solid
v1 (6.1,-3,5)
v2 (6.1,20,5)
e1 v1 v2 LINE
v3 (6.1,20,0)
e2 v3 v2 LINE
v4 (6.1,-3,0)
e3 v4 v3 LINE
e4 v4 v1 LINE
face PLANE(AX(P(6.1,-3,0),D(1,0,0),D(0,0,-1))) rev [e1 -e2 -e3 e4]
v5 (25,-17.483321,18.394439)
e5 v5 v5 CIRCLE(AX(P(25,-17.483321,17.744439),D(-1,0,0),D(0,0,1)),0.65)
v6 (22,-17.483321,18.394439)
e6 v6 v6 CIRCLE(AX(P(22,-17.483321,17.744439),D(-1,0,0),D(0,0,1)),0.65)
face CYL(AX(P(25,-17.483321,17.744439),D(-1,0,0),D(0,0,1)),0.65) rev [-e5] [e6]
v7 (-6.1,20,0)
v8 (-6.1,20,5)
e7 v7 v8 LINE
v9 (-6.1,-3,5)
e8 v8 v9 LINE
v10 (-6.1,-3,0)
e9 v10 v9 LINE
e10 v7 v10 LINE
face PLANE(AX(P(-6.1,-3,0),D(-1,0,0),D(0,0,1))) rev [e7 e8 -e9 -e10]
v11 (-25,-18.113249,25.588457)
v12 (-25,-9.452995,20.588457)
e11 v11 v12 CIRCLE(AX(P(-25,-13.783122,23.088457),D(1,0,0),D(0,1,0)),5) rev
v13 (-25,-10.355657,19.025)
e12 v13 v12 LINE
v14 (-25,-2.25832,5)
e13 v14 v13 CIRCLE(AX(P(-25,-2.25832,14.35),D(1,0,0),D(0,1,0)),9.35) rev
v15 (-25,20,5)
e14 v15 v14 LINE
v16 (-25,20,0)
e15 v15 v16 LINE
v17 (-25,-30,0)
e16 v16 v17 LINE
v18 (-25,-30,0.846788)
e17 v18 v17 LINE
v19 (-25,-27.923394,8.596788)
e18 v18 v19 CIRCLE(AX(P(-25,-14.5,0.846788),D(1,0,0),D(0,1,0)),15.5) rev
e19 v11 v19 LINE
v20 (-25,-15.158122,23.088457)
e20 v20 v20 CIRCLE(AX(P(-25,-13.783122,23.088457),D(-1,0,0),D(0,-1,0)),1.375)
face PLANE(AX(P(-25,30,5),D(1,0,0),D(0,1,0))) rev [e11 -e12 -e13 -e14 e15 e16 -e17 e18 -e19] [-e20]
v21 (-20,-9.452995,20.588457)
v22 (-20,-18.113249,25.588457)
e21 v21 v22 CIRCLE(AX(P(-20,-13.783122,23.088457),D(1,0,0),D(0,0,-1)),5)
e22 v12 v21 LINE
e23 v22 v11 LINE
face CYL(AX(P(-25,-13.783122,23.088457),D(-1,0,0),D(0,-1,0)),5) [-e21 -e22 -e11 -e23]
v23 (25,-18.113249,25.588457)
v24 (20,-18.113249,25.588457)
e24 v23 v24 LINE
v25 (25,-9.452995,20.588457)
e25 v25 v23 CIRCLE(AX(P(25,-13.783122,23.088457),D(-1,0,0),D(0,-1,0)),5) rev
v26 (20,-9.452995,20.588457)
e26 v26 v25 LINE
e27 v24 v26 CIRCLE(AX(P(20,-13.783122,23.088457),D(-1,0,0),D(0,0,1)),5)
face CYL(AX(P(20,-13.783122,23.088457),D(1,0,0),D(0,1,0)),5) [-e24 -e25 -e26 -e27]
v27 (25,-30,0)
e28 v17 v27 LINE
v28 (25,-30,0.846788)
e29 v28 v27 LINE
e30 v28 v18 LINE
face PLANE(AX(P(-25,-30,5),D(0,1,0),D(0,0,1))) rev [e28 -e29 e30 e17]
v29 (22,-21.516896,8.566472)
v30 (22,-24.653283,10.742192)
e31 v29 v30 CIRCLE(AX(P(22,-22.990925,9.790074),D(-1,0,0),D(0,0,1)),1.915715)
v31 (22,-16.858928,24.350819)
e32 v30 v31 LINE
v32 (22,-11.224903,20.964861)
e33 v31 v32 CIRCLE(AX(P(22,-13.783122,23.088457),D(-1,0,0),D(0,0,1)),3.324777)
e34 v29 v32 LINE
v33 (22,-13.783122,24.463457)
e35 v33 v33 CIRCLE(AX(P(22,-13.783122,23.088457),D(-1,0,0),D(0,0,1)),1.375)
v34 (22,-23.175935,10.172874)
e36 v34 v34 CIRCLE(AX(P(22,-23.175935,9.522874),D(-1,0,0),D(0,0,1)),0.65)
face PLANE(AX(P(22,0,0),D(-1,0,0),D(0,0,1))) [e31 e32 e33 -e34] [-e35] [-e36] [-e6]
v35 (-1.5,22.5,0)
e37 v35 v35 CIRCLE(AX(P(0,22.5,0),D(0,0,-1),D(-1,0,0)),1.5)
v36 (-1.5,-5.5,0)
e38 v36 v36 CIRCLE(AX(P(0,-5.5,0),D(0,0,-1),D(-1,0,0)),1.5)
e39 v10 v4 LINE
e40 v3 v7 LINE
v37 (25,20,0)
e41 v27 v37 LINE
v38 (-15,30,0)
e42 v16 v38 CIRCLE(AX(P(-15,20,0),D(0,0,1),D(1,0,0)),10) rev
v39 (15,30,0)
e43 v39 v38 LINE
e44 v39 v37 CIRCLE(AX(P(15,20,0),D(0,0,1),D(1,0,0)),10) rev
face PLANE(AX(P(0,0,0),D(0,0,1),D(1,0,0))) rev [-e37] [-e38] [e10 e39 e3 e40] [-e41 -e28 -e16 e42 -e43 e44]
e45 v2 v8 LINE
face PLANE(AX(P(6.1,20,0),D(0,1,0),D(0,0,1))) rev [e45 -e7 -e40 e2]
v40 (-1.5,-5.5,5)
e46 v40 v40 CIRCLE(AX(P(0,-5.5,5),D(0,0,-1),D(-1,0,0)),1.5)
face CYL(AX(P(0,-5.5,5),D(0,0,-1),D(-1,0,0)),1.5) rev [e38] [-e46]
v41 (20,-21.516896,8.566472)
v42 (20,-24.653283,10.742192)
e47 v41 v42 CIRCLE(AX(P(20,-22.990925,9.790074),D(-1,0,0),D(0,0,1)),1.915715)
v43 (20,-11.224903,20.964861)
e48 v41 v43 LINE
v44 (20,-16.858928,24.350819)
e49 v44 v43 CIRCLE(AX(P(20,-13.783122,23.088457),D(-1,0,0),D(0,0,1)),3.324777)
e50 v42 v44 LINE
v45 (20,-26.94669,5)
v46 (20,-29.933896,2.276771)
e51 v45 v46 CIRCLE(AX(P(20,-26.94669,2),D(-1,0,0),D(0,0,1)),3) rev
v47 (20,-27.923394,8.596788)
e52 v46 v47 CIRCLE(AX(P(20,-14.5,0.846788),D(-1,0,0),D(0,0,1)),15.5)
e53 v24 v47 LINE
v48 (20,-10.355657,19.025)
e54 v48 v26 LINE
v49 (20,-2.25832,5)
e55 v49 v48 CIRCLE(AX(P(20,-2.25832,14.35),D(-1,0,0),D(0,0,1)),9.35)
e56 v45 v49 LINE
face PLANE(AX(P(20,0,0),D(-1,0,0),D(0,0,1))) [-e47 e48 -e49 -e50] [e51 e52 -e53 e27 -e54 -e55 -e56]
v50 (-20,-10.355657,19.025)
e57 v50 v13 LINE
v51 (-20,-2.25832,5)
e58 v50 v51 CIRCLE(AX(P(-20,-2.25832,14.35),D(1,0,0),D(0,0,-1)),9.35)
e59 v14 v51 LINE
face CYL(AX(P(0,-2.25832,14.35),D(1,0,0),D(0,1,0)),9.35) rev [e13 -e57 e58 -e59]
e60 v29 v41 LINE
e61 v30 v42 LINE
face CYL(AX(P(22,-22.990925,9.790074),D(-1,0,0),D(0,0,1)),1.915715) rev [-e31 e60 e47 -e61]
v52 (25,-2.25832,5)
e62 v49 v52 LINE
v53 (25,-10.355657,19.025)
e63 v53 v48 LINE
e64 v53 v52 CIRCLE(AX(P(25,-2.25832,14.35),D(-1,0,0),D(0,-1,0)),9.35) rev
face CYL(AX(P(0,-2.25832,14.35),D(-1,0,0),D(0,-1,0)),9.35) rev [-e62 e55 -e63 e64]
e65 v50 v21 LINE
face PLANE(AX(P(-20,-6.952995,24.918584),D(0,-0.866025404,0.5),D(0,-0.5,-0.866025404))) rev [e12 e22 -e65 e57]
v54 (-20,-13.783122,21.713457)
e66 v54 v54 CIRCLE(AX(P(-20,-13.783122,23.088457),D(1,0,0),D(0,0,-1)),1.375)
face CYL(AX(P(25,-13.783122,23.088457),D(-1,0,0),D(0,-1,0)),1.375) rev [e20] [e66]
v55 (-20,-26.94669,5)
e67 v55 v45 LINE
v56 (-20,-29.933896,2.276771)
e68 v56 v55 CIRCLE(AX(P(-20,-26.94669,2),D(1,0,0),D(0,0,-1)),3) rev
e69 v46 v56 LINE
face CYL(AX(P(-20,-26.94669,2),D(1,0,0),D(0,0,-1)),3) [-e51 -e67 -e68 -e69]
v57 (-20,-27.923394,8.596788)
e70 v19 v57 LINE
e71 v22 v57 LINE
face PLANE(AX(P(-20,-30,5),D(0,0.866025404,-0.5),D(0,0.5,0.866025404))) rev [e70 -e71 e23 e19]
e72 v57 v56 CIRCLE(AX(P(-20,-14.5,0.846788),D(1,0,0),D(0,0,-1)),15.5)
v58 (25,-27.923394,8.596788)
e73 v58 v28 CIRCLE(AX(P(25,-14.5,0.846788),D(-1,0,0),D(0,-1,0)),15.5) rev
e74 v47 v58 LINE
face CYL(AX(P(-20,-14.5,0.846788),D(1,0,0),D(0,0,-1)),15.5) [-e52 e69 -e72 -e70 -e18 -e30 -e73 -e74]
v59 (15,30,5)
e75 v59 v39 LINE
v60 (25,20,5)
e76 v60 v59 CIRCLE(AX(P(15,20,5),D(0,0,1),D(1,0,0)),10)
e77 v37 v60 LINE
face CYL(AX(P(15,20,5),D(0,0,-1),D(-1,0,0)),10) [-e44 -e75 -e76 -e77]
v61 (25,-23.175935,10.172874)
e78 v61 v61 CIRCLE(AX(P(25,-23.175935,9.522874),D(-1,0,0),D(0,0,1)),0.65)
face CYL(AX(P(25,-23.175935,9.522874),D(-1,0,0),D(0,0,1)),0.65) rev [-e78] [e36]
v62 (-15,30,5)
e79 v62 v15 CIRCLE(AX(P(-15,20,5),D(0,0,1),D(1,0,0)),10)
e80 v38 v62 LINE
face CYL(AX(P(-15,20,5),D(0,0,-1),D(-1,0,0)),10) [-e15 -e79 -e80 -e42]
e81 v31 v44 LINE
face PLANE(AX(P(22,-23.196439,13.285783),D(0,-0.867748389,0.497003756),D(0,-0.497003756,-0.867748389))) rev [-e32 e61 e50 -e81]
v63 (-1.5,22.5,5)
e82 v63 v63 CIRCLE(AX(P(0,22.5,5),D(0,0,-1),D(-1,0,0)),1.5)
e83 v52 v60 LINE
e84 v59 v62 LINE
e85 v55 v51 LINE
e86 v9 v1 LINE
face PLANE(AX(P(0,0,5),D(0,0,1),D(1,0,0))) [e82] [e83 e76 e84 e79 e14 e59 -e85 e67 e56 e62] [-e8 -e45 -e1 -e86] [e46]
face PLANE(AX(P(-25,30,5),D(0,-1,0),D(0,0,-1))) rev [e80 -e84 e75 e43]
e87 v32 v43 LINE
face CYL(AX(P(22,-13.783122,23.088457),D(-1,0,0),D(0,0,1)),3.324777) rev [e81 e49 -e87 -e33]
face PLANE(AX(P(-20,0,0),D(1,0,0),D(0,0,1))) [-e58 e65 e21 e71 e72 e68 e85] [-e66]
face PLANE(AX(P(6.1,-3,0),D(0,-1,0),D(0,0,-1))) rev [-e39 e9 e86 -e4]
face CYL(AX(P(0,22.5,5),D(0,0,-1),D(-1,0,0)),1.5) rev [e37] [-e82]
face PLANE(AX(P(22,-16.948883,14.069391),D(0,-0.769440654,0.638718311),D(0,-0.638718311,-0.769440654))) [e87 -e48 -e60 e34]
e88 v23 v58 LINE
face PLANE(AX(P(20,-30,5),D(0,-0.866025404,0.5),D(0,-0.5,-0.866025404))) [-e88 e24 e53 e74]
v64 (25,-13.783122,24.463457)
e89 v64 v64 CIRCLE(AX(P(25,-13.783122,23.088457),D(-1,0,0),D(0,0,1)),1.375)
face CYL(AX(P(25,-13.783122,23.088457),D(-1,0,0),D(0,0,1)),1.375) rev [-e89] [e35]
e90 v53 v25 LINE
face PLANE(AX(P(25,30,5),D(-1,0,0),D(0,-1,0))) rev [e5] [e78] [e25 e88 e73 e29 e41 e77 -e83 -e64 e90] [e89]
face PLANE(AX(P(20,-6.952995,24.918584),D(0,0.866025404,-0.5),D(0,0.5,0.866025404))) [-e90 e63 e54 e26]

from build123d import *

# Parameters (mm, degrees)
ESQUISSE1_W                  = 50
ESQUISSE1_H                  = 60
BOSS_EXTRU_1_DEPTH           = 5
ESQUISSE2_W                  = 12.2
ESQUISSE2_H                  = 23
ENL_V_MAT_EXTRU_1_DEPTH      = 40.37003937
ESQUISSE3_R                  = 1.5
ENL_V_MAT_EXTRU_2_DEPTH      = 40.37003937
BOSS_EXTRU_2_DEPTH           = 5
CONG_1_RADIUS                = 5
CONG_1_LENGTH                = 5
CONG_2_R                     = 9.35
ENL_V_MAT_EXTRU_3_DEPTH      = 2
ESQUISSE6_R                  = 0.65
ESQUISSE6_R_2                = 1.375
ENL_V_MAT_EXTRU_4_DEPTH      = 61.942279509
CONG_1_OF_SYM_TRIE1_2_RADIUS = 5
CONG_1_OF_SYM_TRIE1_2_LENGTH = 5
CONG_2_OF_SYM_TRIE1_R        = 9.35
ESQUISSE7_R                  = 1.375
ENL_V_MAT_EXTRU_5_DEPTH      = 65.722186549
CONG_3_R                     = 15.5
CONG_4_R                     = 3
CONG_5_R                     = 10


with BuildPart() as part:
    # Esquisse1 → Boss.-Extru.1 (new body)
    with BuildSketch(Plane.XY):
        Rectangle(ESQUISSE1_W, ESQUISSE1_H)
    extrude(amount=BOSS_EXTRU_1_DEPTH)

    # Esquisse2 → Enlèv. mat.-Extru.1 (cut, through all)
    with BuildSketch(Plane.XY.offset(5)):
        with Locations((0, 8.5)):
            Rectangle(ESQUISSE2_W, ESQUISSE2_H)
    extrude(amount=-ENL_V_MAT_EXTRU_1_DEPTH, mode=Mode.SUBTRACT)

    # Esquisse3 → Enlèv. mat.-Extru.2 (cut, through all)
    with BuildSketch(Plane(origin=(0, 0, 0), x_dir=(-1, 0, 0), z_dir=(0, 0, -1))):
        with Locations((0, -5.5)):
            Circle(ESQUISSE3_R)
        with Locations((0, 22.5)):
            Circle(ESQUISSE3_R)
    extrude(amount=-ENL_V_MAT_EXTRU_2_DEPTH, mode=Mode.SUBTRACT)

    # Esquisse4 → Boss.-Extru.2 (add)
    with BuildSketch(Plane(origin=(25, 0, 0), x_dir=(0, 0, -1), z_dir=(1, 0, 0))):
        Polygon((-5, -30), (-29.918584287, -15.613248654), (-24.918584287, -6.952994616), (-5, -18.452994616), align=None)
    boss_extru_2 = extrude(amount=-BOSS_EXTRU_2_DEPTH)

    # Congé1: full round fillet: the end face becomes a half cylinder, R = half its width
    cong_1_face = Plane((22.5, -11.283121635, 27.418584287), x_dir=(1, 0, 0), z_dir=(0, 0.5, 0.866025403784))  # on the end face: x along it, z out of the body
    cong_1_slab = cong_1_face.offset(-CONG_1_RADIUS / 2) * Box(CONG_1_LENGTH, 2 * CONG_1_RADIUS, CONG_1_RADIUS, mode=Mode.PRIVATE)  # the body's end, R deep
    cong_1_round = Plane((22.5, -13.783121635, 23.088457268), x_dir=(0, 0.5, 0.866025403784), z_dir=(1, 0, 0)) * Cylinder(CONG_1_RADIUS, CONG_1_LENGTH, mode=Mode.PRIVATE)  # its axis R under the face
    add(cong_1_slab - cong_1_round, mode=Mode.SUBTRACT)

    # Congé2
    cong_2_edges = [part.edges().sort_by_distance(p)[0] for p in [
        (22.5, -18.452994616, 5),
    ]]
    fillet(cong_2_edges, radius=CONG_2_R)

    # Esquisse5 → Enlèv. mat.-Extru.3 (cut)
    with BuildSketch(Plane.ZY.offset(-20)):
        with BuildLine():
            Line((10.742191848, -24.653283165), (24.350818961, -16.858928401))
            ThreePointArc((24.350818961, -16.858928401), (25.938192754, -12.070476908), (20.964861107, -11.224902792))
            Line((20.964861107, -11.224902792), (8.56647232, -21.51689595))
            ThreePointArc((8.56647232, -21.51689595), (8.216016866, -24.082852363), (10.742191848, -24.653283165))
        make_face()
    extrude(amount=-ENL_V_MAT_EXTRU_3_DEPTH, mode=Mode.SUBTRACT)

    # Esquisse6 → Enlèv. mat.-Extru.4 (cut, through all)
    with BuildSketch(Plane.ZY.offset(-20)):
        with Locations((9.522873524, -23.175934722)):
            Circle(ESQUISSE6_R)
        with Locations((17.74443943, -17.48332073)):
            Circle(ESQUISSE6_R)
        with Locations((23.088457268, -13.783121635)):
            Circle(ESQUISSE6_R_2)
    extrude(amount=-ENL_V_MAT_EXTRU_4_DEPTH, mode=Mode.SUBTRACT)

    # Symétrie1: Boss.-Extru.2 across plane
    add(boss_extru_2.mirror(Plane(origin=(0, 0, 0), x_dir=(0, 0, 1), z_dir=(1, 0, 0))))

    # Congé1 of Sym_trie1 2: full round fillet: the end face becomes a half cylinder, R = half its width
    cong_1_of_sym_trie1_2_face = Plane((-22.5, -11.283121635, 27.418584287), x_dir=(-1, 0, 0), z_dir=(0, 0.5, 0.866025403784))  # on the end face: x along it, z out of the body
    cong_1_of_sym_trie1_2_slab = cong_1_of_sym_trie1_2_face.offset(-CONG_1_OF_SYM_TRIE1_2_RADIUS / 2) * Box(CONG_1_OF_SYM_TRIE1_2_LENGTH, 2 * CONG_1_OF_SYM_TRIE1_2_RADIUS, CONG_1_OF_SYM_TRIE1_2_RADIUS, mode=Mode.PRIVATE)  # the body's end, R deep
    cong_1_of_sym_trie1_2_round = Plane((-22.5, -13.783121635, 23.088457268), x_dir=(0, 0.5, 0.866025403784), z_dir=(-1, 0, 0)) * Cylinder(CONG_1_OF_SYM_TRIE1_2_RADIUS, CONG_1_OF_SYM_TRIE1_2_LENGTH, mode=Mode.PRIVATE)  # its axis R under the face
    add(cong_1_of_sym_trie1_2_slab - cong_1_of_sym_trie1_2_round, mode=Mode.SUBTRACT)

    # Congé2 of Symétrie1
    cong_2_of_sym_trie1_edges = [part.edges().sort_by_distance(p)[0] for p in [
        (-22.5, -18.452994616, 5),
    ]]
    fillet(cong_2_of_sym_trie1_edges, radius=CONG_2_OF_SYM_TRIE1_R)

    # Esquisse7 → Enlèv. mat.-Extru.5 (cut, through all)
    with BuildSketch(Plane.ZY.offset(25)):
        with Locations((23.088457268, -13.783121635)):
            Circle(ESQUISSE7_R)
    extrude(amount=-ENL_V_MAT_EXTRU_5_DEPTH, mode=Mode.SUBTRACT)

    # Congé3
    # the kernel refuses this fillet: 15.5 mm, written as the material it takes off along each edge
    with BuildSketch(Plane(origin=(4.919274896, -30, 5), x_dir=(0, 0, -1), z_dir=(-1, 0, 0)), Plane(origin=(49.919274896, -30, 5), x_dir=(0, 0, -1), z_dir=(-1, 0, 0))) as cong_3_piece_1:
        with BuildLine():
            CenterArc((CONG_3_R * 0.267949192431, -CONG_3_R), CONG_3_R, 90, 30)
            Line((-CONG_3_R * 0.232050807569, -CONG_3_R * 0.133974596216), (-CONG_3_R * 0.242050807569, -CONG_3_R * 0.11665408814))
            Line((-CONG_3_R * 0.242050807569, -CONG_3_R * 0.11665408814), (-CONG_3_R * 0.00535898384862, CONG_3_R * 0.02))
            Line((-CONG_3_R * 0.00535898384862, CONG_3_R * 0.02), (CONG_3_R * 0.267949192431, CONG_3_R * 0.02))
            Line((CONG_3_R * 0.267949192431, CONG_3_R * 0.02), (CONG_3_R * 0.267949192431, 0))
        make_face()
    extrude(amount=54.838549792, mode=Mode.SUBTRACT)

    # Congé4
    cong_4_edges = [part.edges().sort_by_distance(p)[0] for p in [
        (0, -29.433212182, 5),
    ]]
    fillet(cong_4_edges, radius=CONG_4_R)

    # Congé5
    cong_5_edges = [part.edges().sort_by_distance(p)[0] for p in [
        (-25, 30, 2.5),
        (25, 30, 2.5),
    ]]
    fillet(cong_5_edges, radius=CONG_5_R)


solid = part.part
